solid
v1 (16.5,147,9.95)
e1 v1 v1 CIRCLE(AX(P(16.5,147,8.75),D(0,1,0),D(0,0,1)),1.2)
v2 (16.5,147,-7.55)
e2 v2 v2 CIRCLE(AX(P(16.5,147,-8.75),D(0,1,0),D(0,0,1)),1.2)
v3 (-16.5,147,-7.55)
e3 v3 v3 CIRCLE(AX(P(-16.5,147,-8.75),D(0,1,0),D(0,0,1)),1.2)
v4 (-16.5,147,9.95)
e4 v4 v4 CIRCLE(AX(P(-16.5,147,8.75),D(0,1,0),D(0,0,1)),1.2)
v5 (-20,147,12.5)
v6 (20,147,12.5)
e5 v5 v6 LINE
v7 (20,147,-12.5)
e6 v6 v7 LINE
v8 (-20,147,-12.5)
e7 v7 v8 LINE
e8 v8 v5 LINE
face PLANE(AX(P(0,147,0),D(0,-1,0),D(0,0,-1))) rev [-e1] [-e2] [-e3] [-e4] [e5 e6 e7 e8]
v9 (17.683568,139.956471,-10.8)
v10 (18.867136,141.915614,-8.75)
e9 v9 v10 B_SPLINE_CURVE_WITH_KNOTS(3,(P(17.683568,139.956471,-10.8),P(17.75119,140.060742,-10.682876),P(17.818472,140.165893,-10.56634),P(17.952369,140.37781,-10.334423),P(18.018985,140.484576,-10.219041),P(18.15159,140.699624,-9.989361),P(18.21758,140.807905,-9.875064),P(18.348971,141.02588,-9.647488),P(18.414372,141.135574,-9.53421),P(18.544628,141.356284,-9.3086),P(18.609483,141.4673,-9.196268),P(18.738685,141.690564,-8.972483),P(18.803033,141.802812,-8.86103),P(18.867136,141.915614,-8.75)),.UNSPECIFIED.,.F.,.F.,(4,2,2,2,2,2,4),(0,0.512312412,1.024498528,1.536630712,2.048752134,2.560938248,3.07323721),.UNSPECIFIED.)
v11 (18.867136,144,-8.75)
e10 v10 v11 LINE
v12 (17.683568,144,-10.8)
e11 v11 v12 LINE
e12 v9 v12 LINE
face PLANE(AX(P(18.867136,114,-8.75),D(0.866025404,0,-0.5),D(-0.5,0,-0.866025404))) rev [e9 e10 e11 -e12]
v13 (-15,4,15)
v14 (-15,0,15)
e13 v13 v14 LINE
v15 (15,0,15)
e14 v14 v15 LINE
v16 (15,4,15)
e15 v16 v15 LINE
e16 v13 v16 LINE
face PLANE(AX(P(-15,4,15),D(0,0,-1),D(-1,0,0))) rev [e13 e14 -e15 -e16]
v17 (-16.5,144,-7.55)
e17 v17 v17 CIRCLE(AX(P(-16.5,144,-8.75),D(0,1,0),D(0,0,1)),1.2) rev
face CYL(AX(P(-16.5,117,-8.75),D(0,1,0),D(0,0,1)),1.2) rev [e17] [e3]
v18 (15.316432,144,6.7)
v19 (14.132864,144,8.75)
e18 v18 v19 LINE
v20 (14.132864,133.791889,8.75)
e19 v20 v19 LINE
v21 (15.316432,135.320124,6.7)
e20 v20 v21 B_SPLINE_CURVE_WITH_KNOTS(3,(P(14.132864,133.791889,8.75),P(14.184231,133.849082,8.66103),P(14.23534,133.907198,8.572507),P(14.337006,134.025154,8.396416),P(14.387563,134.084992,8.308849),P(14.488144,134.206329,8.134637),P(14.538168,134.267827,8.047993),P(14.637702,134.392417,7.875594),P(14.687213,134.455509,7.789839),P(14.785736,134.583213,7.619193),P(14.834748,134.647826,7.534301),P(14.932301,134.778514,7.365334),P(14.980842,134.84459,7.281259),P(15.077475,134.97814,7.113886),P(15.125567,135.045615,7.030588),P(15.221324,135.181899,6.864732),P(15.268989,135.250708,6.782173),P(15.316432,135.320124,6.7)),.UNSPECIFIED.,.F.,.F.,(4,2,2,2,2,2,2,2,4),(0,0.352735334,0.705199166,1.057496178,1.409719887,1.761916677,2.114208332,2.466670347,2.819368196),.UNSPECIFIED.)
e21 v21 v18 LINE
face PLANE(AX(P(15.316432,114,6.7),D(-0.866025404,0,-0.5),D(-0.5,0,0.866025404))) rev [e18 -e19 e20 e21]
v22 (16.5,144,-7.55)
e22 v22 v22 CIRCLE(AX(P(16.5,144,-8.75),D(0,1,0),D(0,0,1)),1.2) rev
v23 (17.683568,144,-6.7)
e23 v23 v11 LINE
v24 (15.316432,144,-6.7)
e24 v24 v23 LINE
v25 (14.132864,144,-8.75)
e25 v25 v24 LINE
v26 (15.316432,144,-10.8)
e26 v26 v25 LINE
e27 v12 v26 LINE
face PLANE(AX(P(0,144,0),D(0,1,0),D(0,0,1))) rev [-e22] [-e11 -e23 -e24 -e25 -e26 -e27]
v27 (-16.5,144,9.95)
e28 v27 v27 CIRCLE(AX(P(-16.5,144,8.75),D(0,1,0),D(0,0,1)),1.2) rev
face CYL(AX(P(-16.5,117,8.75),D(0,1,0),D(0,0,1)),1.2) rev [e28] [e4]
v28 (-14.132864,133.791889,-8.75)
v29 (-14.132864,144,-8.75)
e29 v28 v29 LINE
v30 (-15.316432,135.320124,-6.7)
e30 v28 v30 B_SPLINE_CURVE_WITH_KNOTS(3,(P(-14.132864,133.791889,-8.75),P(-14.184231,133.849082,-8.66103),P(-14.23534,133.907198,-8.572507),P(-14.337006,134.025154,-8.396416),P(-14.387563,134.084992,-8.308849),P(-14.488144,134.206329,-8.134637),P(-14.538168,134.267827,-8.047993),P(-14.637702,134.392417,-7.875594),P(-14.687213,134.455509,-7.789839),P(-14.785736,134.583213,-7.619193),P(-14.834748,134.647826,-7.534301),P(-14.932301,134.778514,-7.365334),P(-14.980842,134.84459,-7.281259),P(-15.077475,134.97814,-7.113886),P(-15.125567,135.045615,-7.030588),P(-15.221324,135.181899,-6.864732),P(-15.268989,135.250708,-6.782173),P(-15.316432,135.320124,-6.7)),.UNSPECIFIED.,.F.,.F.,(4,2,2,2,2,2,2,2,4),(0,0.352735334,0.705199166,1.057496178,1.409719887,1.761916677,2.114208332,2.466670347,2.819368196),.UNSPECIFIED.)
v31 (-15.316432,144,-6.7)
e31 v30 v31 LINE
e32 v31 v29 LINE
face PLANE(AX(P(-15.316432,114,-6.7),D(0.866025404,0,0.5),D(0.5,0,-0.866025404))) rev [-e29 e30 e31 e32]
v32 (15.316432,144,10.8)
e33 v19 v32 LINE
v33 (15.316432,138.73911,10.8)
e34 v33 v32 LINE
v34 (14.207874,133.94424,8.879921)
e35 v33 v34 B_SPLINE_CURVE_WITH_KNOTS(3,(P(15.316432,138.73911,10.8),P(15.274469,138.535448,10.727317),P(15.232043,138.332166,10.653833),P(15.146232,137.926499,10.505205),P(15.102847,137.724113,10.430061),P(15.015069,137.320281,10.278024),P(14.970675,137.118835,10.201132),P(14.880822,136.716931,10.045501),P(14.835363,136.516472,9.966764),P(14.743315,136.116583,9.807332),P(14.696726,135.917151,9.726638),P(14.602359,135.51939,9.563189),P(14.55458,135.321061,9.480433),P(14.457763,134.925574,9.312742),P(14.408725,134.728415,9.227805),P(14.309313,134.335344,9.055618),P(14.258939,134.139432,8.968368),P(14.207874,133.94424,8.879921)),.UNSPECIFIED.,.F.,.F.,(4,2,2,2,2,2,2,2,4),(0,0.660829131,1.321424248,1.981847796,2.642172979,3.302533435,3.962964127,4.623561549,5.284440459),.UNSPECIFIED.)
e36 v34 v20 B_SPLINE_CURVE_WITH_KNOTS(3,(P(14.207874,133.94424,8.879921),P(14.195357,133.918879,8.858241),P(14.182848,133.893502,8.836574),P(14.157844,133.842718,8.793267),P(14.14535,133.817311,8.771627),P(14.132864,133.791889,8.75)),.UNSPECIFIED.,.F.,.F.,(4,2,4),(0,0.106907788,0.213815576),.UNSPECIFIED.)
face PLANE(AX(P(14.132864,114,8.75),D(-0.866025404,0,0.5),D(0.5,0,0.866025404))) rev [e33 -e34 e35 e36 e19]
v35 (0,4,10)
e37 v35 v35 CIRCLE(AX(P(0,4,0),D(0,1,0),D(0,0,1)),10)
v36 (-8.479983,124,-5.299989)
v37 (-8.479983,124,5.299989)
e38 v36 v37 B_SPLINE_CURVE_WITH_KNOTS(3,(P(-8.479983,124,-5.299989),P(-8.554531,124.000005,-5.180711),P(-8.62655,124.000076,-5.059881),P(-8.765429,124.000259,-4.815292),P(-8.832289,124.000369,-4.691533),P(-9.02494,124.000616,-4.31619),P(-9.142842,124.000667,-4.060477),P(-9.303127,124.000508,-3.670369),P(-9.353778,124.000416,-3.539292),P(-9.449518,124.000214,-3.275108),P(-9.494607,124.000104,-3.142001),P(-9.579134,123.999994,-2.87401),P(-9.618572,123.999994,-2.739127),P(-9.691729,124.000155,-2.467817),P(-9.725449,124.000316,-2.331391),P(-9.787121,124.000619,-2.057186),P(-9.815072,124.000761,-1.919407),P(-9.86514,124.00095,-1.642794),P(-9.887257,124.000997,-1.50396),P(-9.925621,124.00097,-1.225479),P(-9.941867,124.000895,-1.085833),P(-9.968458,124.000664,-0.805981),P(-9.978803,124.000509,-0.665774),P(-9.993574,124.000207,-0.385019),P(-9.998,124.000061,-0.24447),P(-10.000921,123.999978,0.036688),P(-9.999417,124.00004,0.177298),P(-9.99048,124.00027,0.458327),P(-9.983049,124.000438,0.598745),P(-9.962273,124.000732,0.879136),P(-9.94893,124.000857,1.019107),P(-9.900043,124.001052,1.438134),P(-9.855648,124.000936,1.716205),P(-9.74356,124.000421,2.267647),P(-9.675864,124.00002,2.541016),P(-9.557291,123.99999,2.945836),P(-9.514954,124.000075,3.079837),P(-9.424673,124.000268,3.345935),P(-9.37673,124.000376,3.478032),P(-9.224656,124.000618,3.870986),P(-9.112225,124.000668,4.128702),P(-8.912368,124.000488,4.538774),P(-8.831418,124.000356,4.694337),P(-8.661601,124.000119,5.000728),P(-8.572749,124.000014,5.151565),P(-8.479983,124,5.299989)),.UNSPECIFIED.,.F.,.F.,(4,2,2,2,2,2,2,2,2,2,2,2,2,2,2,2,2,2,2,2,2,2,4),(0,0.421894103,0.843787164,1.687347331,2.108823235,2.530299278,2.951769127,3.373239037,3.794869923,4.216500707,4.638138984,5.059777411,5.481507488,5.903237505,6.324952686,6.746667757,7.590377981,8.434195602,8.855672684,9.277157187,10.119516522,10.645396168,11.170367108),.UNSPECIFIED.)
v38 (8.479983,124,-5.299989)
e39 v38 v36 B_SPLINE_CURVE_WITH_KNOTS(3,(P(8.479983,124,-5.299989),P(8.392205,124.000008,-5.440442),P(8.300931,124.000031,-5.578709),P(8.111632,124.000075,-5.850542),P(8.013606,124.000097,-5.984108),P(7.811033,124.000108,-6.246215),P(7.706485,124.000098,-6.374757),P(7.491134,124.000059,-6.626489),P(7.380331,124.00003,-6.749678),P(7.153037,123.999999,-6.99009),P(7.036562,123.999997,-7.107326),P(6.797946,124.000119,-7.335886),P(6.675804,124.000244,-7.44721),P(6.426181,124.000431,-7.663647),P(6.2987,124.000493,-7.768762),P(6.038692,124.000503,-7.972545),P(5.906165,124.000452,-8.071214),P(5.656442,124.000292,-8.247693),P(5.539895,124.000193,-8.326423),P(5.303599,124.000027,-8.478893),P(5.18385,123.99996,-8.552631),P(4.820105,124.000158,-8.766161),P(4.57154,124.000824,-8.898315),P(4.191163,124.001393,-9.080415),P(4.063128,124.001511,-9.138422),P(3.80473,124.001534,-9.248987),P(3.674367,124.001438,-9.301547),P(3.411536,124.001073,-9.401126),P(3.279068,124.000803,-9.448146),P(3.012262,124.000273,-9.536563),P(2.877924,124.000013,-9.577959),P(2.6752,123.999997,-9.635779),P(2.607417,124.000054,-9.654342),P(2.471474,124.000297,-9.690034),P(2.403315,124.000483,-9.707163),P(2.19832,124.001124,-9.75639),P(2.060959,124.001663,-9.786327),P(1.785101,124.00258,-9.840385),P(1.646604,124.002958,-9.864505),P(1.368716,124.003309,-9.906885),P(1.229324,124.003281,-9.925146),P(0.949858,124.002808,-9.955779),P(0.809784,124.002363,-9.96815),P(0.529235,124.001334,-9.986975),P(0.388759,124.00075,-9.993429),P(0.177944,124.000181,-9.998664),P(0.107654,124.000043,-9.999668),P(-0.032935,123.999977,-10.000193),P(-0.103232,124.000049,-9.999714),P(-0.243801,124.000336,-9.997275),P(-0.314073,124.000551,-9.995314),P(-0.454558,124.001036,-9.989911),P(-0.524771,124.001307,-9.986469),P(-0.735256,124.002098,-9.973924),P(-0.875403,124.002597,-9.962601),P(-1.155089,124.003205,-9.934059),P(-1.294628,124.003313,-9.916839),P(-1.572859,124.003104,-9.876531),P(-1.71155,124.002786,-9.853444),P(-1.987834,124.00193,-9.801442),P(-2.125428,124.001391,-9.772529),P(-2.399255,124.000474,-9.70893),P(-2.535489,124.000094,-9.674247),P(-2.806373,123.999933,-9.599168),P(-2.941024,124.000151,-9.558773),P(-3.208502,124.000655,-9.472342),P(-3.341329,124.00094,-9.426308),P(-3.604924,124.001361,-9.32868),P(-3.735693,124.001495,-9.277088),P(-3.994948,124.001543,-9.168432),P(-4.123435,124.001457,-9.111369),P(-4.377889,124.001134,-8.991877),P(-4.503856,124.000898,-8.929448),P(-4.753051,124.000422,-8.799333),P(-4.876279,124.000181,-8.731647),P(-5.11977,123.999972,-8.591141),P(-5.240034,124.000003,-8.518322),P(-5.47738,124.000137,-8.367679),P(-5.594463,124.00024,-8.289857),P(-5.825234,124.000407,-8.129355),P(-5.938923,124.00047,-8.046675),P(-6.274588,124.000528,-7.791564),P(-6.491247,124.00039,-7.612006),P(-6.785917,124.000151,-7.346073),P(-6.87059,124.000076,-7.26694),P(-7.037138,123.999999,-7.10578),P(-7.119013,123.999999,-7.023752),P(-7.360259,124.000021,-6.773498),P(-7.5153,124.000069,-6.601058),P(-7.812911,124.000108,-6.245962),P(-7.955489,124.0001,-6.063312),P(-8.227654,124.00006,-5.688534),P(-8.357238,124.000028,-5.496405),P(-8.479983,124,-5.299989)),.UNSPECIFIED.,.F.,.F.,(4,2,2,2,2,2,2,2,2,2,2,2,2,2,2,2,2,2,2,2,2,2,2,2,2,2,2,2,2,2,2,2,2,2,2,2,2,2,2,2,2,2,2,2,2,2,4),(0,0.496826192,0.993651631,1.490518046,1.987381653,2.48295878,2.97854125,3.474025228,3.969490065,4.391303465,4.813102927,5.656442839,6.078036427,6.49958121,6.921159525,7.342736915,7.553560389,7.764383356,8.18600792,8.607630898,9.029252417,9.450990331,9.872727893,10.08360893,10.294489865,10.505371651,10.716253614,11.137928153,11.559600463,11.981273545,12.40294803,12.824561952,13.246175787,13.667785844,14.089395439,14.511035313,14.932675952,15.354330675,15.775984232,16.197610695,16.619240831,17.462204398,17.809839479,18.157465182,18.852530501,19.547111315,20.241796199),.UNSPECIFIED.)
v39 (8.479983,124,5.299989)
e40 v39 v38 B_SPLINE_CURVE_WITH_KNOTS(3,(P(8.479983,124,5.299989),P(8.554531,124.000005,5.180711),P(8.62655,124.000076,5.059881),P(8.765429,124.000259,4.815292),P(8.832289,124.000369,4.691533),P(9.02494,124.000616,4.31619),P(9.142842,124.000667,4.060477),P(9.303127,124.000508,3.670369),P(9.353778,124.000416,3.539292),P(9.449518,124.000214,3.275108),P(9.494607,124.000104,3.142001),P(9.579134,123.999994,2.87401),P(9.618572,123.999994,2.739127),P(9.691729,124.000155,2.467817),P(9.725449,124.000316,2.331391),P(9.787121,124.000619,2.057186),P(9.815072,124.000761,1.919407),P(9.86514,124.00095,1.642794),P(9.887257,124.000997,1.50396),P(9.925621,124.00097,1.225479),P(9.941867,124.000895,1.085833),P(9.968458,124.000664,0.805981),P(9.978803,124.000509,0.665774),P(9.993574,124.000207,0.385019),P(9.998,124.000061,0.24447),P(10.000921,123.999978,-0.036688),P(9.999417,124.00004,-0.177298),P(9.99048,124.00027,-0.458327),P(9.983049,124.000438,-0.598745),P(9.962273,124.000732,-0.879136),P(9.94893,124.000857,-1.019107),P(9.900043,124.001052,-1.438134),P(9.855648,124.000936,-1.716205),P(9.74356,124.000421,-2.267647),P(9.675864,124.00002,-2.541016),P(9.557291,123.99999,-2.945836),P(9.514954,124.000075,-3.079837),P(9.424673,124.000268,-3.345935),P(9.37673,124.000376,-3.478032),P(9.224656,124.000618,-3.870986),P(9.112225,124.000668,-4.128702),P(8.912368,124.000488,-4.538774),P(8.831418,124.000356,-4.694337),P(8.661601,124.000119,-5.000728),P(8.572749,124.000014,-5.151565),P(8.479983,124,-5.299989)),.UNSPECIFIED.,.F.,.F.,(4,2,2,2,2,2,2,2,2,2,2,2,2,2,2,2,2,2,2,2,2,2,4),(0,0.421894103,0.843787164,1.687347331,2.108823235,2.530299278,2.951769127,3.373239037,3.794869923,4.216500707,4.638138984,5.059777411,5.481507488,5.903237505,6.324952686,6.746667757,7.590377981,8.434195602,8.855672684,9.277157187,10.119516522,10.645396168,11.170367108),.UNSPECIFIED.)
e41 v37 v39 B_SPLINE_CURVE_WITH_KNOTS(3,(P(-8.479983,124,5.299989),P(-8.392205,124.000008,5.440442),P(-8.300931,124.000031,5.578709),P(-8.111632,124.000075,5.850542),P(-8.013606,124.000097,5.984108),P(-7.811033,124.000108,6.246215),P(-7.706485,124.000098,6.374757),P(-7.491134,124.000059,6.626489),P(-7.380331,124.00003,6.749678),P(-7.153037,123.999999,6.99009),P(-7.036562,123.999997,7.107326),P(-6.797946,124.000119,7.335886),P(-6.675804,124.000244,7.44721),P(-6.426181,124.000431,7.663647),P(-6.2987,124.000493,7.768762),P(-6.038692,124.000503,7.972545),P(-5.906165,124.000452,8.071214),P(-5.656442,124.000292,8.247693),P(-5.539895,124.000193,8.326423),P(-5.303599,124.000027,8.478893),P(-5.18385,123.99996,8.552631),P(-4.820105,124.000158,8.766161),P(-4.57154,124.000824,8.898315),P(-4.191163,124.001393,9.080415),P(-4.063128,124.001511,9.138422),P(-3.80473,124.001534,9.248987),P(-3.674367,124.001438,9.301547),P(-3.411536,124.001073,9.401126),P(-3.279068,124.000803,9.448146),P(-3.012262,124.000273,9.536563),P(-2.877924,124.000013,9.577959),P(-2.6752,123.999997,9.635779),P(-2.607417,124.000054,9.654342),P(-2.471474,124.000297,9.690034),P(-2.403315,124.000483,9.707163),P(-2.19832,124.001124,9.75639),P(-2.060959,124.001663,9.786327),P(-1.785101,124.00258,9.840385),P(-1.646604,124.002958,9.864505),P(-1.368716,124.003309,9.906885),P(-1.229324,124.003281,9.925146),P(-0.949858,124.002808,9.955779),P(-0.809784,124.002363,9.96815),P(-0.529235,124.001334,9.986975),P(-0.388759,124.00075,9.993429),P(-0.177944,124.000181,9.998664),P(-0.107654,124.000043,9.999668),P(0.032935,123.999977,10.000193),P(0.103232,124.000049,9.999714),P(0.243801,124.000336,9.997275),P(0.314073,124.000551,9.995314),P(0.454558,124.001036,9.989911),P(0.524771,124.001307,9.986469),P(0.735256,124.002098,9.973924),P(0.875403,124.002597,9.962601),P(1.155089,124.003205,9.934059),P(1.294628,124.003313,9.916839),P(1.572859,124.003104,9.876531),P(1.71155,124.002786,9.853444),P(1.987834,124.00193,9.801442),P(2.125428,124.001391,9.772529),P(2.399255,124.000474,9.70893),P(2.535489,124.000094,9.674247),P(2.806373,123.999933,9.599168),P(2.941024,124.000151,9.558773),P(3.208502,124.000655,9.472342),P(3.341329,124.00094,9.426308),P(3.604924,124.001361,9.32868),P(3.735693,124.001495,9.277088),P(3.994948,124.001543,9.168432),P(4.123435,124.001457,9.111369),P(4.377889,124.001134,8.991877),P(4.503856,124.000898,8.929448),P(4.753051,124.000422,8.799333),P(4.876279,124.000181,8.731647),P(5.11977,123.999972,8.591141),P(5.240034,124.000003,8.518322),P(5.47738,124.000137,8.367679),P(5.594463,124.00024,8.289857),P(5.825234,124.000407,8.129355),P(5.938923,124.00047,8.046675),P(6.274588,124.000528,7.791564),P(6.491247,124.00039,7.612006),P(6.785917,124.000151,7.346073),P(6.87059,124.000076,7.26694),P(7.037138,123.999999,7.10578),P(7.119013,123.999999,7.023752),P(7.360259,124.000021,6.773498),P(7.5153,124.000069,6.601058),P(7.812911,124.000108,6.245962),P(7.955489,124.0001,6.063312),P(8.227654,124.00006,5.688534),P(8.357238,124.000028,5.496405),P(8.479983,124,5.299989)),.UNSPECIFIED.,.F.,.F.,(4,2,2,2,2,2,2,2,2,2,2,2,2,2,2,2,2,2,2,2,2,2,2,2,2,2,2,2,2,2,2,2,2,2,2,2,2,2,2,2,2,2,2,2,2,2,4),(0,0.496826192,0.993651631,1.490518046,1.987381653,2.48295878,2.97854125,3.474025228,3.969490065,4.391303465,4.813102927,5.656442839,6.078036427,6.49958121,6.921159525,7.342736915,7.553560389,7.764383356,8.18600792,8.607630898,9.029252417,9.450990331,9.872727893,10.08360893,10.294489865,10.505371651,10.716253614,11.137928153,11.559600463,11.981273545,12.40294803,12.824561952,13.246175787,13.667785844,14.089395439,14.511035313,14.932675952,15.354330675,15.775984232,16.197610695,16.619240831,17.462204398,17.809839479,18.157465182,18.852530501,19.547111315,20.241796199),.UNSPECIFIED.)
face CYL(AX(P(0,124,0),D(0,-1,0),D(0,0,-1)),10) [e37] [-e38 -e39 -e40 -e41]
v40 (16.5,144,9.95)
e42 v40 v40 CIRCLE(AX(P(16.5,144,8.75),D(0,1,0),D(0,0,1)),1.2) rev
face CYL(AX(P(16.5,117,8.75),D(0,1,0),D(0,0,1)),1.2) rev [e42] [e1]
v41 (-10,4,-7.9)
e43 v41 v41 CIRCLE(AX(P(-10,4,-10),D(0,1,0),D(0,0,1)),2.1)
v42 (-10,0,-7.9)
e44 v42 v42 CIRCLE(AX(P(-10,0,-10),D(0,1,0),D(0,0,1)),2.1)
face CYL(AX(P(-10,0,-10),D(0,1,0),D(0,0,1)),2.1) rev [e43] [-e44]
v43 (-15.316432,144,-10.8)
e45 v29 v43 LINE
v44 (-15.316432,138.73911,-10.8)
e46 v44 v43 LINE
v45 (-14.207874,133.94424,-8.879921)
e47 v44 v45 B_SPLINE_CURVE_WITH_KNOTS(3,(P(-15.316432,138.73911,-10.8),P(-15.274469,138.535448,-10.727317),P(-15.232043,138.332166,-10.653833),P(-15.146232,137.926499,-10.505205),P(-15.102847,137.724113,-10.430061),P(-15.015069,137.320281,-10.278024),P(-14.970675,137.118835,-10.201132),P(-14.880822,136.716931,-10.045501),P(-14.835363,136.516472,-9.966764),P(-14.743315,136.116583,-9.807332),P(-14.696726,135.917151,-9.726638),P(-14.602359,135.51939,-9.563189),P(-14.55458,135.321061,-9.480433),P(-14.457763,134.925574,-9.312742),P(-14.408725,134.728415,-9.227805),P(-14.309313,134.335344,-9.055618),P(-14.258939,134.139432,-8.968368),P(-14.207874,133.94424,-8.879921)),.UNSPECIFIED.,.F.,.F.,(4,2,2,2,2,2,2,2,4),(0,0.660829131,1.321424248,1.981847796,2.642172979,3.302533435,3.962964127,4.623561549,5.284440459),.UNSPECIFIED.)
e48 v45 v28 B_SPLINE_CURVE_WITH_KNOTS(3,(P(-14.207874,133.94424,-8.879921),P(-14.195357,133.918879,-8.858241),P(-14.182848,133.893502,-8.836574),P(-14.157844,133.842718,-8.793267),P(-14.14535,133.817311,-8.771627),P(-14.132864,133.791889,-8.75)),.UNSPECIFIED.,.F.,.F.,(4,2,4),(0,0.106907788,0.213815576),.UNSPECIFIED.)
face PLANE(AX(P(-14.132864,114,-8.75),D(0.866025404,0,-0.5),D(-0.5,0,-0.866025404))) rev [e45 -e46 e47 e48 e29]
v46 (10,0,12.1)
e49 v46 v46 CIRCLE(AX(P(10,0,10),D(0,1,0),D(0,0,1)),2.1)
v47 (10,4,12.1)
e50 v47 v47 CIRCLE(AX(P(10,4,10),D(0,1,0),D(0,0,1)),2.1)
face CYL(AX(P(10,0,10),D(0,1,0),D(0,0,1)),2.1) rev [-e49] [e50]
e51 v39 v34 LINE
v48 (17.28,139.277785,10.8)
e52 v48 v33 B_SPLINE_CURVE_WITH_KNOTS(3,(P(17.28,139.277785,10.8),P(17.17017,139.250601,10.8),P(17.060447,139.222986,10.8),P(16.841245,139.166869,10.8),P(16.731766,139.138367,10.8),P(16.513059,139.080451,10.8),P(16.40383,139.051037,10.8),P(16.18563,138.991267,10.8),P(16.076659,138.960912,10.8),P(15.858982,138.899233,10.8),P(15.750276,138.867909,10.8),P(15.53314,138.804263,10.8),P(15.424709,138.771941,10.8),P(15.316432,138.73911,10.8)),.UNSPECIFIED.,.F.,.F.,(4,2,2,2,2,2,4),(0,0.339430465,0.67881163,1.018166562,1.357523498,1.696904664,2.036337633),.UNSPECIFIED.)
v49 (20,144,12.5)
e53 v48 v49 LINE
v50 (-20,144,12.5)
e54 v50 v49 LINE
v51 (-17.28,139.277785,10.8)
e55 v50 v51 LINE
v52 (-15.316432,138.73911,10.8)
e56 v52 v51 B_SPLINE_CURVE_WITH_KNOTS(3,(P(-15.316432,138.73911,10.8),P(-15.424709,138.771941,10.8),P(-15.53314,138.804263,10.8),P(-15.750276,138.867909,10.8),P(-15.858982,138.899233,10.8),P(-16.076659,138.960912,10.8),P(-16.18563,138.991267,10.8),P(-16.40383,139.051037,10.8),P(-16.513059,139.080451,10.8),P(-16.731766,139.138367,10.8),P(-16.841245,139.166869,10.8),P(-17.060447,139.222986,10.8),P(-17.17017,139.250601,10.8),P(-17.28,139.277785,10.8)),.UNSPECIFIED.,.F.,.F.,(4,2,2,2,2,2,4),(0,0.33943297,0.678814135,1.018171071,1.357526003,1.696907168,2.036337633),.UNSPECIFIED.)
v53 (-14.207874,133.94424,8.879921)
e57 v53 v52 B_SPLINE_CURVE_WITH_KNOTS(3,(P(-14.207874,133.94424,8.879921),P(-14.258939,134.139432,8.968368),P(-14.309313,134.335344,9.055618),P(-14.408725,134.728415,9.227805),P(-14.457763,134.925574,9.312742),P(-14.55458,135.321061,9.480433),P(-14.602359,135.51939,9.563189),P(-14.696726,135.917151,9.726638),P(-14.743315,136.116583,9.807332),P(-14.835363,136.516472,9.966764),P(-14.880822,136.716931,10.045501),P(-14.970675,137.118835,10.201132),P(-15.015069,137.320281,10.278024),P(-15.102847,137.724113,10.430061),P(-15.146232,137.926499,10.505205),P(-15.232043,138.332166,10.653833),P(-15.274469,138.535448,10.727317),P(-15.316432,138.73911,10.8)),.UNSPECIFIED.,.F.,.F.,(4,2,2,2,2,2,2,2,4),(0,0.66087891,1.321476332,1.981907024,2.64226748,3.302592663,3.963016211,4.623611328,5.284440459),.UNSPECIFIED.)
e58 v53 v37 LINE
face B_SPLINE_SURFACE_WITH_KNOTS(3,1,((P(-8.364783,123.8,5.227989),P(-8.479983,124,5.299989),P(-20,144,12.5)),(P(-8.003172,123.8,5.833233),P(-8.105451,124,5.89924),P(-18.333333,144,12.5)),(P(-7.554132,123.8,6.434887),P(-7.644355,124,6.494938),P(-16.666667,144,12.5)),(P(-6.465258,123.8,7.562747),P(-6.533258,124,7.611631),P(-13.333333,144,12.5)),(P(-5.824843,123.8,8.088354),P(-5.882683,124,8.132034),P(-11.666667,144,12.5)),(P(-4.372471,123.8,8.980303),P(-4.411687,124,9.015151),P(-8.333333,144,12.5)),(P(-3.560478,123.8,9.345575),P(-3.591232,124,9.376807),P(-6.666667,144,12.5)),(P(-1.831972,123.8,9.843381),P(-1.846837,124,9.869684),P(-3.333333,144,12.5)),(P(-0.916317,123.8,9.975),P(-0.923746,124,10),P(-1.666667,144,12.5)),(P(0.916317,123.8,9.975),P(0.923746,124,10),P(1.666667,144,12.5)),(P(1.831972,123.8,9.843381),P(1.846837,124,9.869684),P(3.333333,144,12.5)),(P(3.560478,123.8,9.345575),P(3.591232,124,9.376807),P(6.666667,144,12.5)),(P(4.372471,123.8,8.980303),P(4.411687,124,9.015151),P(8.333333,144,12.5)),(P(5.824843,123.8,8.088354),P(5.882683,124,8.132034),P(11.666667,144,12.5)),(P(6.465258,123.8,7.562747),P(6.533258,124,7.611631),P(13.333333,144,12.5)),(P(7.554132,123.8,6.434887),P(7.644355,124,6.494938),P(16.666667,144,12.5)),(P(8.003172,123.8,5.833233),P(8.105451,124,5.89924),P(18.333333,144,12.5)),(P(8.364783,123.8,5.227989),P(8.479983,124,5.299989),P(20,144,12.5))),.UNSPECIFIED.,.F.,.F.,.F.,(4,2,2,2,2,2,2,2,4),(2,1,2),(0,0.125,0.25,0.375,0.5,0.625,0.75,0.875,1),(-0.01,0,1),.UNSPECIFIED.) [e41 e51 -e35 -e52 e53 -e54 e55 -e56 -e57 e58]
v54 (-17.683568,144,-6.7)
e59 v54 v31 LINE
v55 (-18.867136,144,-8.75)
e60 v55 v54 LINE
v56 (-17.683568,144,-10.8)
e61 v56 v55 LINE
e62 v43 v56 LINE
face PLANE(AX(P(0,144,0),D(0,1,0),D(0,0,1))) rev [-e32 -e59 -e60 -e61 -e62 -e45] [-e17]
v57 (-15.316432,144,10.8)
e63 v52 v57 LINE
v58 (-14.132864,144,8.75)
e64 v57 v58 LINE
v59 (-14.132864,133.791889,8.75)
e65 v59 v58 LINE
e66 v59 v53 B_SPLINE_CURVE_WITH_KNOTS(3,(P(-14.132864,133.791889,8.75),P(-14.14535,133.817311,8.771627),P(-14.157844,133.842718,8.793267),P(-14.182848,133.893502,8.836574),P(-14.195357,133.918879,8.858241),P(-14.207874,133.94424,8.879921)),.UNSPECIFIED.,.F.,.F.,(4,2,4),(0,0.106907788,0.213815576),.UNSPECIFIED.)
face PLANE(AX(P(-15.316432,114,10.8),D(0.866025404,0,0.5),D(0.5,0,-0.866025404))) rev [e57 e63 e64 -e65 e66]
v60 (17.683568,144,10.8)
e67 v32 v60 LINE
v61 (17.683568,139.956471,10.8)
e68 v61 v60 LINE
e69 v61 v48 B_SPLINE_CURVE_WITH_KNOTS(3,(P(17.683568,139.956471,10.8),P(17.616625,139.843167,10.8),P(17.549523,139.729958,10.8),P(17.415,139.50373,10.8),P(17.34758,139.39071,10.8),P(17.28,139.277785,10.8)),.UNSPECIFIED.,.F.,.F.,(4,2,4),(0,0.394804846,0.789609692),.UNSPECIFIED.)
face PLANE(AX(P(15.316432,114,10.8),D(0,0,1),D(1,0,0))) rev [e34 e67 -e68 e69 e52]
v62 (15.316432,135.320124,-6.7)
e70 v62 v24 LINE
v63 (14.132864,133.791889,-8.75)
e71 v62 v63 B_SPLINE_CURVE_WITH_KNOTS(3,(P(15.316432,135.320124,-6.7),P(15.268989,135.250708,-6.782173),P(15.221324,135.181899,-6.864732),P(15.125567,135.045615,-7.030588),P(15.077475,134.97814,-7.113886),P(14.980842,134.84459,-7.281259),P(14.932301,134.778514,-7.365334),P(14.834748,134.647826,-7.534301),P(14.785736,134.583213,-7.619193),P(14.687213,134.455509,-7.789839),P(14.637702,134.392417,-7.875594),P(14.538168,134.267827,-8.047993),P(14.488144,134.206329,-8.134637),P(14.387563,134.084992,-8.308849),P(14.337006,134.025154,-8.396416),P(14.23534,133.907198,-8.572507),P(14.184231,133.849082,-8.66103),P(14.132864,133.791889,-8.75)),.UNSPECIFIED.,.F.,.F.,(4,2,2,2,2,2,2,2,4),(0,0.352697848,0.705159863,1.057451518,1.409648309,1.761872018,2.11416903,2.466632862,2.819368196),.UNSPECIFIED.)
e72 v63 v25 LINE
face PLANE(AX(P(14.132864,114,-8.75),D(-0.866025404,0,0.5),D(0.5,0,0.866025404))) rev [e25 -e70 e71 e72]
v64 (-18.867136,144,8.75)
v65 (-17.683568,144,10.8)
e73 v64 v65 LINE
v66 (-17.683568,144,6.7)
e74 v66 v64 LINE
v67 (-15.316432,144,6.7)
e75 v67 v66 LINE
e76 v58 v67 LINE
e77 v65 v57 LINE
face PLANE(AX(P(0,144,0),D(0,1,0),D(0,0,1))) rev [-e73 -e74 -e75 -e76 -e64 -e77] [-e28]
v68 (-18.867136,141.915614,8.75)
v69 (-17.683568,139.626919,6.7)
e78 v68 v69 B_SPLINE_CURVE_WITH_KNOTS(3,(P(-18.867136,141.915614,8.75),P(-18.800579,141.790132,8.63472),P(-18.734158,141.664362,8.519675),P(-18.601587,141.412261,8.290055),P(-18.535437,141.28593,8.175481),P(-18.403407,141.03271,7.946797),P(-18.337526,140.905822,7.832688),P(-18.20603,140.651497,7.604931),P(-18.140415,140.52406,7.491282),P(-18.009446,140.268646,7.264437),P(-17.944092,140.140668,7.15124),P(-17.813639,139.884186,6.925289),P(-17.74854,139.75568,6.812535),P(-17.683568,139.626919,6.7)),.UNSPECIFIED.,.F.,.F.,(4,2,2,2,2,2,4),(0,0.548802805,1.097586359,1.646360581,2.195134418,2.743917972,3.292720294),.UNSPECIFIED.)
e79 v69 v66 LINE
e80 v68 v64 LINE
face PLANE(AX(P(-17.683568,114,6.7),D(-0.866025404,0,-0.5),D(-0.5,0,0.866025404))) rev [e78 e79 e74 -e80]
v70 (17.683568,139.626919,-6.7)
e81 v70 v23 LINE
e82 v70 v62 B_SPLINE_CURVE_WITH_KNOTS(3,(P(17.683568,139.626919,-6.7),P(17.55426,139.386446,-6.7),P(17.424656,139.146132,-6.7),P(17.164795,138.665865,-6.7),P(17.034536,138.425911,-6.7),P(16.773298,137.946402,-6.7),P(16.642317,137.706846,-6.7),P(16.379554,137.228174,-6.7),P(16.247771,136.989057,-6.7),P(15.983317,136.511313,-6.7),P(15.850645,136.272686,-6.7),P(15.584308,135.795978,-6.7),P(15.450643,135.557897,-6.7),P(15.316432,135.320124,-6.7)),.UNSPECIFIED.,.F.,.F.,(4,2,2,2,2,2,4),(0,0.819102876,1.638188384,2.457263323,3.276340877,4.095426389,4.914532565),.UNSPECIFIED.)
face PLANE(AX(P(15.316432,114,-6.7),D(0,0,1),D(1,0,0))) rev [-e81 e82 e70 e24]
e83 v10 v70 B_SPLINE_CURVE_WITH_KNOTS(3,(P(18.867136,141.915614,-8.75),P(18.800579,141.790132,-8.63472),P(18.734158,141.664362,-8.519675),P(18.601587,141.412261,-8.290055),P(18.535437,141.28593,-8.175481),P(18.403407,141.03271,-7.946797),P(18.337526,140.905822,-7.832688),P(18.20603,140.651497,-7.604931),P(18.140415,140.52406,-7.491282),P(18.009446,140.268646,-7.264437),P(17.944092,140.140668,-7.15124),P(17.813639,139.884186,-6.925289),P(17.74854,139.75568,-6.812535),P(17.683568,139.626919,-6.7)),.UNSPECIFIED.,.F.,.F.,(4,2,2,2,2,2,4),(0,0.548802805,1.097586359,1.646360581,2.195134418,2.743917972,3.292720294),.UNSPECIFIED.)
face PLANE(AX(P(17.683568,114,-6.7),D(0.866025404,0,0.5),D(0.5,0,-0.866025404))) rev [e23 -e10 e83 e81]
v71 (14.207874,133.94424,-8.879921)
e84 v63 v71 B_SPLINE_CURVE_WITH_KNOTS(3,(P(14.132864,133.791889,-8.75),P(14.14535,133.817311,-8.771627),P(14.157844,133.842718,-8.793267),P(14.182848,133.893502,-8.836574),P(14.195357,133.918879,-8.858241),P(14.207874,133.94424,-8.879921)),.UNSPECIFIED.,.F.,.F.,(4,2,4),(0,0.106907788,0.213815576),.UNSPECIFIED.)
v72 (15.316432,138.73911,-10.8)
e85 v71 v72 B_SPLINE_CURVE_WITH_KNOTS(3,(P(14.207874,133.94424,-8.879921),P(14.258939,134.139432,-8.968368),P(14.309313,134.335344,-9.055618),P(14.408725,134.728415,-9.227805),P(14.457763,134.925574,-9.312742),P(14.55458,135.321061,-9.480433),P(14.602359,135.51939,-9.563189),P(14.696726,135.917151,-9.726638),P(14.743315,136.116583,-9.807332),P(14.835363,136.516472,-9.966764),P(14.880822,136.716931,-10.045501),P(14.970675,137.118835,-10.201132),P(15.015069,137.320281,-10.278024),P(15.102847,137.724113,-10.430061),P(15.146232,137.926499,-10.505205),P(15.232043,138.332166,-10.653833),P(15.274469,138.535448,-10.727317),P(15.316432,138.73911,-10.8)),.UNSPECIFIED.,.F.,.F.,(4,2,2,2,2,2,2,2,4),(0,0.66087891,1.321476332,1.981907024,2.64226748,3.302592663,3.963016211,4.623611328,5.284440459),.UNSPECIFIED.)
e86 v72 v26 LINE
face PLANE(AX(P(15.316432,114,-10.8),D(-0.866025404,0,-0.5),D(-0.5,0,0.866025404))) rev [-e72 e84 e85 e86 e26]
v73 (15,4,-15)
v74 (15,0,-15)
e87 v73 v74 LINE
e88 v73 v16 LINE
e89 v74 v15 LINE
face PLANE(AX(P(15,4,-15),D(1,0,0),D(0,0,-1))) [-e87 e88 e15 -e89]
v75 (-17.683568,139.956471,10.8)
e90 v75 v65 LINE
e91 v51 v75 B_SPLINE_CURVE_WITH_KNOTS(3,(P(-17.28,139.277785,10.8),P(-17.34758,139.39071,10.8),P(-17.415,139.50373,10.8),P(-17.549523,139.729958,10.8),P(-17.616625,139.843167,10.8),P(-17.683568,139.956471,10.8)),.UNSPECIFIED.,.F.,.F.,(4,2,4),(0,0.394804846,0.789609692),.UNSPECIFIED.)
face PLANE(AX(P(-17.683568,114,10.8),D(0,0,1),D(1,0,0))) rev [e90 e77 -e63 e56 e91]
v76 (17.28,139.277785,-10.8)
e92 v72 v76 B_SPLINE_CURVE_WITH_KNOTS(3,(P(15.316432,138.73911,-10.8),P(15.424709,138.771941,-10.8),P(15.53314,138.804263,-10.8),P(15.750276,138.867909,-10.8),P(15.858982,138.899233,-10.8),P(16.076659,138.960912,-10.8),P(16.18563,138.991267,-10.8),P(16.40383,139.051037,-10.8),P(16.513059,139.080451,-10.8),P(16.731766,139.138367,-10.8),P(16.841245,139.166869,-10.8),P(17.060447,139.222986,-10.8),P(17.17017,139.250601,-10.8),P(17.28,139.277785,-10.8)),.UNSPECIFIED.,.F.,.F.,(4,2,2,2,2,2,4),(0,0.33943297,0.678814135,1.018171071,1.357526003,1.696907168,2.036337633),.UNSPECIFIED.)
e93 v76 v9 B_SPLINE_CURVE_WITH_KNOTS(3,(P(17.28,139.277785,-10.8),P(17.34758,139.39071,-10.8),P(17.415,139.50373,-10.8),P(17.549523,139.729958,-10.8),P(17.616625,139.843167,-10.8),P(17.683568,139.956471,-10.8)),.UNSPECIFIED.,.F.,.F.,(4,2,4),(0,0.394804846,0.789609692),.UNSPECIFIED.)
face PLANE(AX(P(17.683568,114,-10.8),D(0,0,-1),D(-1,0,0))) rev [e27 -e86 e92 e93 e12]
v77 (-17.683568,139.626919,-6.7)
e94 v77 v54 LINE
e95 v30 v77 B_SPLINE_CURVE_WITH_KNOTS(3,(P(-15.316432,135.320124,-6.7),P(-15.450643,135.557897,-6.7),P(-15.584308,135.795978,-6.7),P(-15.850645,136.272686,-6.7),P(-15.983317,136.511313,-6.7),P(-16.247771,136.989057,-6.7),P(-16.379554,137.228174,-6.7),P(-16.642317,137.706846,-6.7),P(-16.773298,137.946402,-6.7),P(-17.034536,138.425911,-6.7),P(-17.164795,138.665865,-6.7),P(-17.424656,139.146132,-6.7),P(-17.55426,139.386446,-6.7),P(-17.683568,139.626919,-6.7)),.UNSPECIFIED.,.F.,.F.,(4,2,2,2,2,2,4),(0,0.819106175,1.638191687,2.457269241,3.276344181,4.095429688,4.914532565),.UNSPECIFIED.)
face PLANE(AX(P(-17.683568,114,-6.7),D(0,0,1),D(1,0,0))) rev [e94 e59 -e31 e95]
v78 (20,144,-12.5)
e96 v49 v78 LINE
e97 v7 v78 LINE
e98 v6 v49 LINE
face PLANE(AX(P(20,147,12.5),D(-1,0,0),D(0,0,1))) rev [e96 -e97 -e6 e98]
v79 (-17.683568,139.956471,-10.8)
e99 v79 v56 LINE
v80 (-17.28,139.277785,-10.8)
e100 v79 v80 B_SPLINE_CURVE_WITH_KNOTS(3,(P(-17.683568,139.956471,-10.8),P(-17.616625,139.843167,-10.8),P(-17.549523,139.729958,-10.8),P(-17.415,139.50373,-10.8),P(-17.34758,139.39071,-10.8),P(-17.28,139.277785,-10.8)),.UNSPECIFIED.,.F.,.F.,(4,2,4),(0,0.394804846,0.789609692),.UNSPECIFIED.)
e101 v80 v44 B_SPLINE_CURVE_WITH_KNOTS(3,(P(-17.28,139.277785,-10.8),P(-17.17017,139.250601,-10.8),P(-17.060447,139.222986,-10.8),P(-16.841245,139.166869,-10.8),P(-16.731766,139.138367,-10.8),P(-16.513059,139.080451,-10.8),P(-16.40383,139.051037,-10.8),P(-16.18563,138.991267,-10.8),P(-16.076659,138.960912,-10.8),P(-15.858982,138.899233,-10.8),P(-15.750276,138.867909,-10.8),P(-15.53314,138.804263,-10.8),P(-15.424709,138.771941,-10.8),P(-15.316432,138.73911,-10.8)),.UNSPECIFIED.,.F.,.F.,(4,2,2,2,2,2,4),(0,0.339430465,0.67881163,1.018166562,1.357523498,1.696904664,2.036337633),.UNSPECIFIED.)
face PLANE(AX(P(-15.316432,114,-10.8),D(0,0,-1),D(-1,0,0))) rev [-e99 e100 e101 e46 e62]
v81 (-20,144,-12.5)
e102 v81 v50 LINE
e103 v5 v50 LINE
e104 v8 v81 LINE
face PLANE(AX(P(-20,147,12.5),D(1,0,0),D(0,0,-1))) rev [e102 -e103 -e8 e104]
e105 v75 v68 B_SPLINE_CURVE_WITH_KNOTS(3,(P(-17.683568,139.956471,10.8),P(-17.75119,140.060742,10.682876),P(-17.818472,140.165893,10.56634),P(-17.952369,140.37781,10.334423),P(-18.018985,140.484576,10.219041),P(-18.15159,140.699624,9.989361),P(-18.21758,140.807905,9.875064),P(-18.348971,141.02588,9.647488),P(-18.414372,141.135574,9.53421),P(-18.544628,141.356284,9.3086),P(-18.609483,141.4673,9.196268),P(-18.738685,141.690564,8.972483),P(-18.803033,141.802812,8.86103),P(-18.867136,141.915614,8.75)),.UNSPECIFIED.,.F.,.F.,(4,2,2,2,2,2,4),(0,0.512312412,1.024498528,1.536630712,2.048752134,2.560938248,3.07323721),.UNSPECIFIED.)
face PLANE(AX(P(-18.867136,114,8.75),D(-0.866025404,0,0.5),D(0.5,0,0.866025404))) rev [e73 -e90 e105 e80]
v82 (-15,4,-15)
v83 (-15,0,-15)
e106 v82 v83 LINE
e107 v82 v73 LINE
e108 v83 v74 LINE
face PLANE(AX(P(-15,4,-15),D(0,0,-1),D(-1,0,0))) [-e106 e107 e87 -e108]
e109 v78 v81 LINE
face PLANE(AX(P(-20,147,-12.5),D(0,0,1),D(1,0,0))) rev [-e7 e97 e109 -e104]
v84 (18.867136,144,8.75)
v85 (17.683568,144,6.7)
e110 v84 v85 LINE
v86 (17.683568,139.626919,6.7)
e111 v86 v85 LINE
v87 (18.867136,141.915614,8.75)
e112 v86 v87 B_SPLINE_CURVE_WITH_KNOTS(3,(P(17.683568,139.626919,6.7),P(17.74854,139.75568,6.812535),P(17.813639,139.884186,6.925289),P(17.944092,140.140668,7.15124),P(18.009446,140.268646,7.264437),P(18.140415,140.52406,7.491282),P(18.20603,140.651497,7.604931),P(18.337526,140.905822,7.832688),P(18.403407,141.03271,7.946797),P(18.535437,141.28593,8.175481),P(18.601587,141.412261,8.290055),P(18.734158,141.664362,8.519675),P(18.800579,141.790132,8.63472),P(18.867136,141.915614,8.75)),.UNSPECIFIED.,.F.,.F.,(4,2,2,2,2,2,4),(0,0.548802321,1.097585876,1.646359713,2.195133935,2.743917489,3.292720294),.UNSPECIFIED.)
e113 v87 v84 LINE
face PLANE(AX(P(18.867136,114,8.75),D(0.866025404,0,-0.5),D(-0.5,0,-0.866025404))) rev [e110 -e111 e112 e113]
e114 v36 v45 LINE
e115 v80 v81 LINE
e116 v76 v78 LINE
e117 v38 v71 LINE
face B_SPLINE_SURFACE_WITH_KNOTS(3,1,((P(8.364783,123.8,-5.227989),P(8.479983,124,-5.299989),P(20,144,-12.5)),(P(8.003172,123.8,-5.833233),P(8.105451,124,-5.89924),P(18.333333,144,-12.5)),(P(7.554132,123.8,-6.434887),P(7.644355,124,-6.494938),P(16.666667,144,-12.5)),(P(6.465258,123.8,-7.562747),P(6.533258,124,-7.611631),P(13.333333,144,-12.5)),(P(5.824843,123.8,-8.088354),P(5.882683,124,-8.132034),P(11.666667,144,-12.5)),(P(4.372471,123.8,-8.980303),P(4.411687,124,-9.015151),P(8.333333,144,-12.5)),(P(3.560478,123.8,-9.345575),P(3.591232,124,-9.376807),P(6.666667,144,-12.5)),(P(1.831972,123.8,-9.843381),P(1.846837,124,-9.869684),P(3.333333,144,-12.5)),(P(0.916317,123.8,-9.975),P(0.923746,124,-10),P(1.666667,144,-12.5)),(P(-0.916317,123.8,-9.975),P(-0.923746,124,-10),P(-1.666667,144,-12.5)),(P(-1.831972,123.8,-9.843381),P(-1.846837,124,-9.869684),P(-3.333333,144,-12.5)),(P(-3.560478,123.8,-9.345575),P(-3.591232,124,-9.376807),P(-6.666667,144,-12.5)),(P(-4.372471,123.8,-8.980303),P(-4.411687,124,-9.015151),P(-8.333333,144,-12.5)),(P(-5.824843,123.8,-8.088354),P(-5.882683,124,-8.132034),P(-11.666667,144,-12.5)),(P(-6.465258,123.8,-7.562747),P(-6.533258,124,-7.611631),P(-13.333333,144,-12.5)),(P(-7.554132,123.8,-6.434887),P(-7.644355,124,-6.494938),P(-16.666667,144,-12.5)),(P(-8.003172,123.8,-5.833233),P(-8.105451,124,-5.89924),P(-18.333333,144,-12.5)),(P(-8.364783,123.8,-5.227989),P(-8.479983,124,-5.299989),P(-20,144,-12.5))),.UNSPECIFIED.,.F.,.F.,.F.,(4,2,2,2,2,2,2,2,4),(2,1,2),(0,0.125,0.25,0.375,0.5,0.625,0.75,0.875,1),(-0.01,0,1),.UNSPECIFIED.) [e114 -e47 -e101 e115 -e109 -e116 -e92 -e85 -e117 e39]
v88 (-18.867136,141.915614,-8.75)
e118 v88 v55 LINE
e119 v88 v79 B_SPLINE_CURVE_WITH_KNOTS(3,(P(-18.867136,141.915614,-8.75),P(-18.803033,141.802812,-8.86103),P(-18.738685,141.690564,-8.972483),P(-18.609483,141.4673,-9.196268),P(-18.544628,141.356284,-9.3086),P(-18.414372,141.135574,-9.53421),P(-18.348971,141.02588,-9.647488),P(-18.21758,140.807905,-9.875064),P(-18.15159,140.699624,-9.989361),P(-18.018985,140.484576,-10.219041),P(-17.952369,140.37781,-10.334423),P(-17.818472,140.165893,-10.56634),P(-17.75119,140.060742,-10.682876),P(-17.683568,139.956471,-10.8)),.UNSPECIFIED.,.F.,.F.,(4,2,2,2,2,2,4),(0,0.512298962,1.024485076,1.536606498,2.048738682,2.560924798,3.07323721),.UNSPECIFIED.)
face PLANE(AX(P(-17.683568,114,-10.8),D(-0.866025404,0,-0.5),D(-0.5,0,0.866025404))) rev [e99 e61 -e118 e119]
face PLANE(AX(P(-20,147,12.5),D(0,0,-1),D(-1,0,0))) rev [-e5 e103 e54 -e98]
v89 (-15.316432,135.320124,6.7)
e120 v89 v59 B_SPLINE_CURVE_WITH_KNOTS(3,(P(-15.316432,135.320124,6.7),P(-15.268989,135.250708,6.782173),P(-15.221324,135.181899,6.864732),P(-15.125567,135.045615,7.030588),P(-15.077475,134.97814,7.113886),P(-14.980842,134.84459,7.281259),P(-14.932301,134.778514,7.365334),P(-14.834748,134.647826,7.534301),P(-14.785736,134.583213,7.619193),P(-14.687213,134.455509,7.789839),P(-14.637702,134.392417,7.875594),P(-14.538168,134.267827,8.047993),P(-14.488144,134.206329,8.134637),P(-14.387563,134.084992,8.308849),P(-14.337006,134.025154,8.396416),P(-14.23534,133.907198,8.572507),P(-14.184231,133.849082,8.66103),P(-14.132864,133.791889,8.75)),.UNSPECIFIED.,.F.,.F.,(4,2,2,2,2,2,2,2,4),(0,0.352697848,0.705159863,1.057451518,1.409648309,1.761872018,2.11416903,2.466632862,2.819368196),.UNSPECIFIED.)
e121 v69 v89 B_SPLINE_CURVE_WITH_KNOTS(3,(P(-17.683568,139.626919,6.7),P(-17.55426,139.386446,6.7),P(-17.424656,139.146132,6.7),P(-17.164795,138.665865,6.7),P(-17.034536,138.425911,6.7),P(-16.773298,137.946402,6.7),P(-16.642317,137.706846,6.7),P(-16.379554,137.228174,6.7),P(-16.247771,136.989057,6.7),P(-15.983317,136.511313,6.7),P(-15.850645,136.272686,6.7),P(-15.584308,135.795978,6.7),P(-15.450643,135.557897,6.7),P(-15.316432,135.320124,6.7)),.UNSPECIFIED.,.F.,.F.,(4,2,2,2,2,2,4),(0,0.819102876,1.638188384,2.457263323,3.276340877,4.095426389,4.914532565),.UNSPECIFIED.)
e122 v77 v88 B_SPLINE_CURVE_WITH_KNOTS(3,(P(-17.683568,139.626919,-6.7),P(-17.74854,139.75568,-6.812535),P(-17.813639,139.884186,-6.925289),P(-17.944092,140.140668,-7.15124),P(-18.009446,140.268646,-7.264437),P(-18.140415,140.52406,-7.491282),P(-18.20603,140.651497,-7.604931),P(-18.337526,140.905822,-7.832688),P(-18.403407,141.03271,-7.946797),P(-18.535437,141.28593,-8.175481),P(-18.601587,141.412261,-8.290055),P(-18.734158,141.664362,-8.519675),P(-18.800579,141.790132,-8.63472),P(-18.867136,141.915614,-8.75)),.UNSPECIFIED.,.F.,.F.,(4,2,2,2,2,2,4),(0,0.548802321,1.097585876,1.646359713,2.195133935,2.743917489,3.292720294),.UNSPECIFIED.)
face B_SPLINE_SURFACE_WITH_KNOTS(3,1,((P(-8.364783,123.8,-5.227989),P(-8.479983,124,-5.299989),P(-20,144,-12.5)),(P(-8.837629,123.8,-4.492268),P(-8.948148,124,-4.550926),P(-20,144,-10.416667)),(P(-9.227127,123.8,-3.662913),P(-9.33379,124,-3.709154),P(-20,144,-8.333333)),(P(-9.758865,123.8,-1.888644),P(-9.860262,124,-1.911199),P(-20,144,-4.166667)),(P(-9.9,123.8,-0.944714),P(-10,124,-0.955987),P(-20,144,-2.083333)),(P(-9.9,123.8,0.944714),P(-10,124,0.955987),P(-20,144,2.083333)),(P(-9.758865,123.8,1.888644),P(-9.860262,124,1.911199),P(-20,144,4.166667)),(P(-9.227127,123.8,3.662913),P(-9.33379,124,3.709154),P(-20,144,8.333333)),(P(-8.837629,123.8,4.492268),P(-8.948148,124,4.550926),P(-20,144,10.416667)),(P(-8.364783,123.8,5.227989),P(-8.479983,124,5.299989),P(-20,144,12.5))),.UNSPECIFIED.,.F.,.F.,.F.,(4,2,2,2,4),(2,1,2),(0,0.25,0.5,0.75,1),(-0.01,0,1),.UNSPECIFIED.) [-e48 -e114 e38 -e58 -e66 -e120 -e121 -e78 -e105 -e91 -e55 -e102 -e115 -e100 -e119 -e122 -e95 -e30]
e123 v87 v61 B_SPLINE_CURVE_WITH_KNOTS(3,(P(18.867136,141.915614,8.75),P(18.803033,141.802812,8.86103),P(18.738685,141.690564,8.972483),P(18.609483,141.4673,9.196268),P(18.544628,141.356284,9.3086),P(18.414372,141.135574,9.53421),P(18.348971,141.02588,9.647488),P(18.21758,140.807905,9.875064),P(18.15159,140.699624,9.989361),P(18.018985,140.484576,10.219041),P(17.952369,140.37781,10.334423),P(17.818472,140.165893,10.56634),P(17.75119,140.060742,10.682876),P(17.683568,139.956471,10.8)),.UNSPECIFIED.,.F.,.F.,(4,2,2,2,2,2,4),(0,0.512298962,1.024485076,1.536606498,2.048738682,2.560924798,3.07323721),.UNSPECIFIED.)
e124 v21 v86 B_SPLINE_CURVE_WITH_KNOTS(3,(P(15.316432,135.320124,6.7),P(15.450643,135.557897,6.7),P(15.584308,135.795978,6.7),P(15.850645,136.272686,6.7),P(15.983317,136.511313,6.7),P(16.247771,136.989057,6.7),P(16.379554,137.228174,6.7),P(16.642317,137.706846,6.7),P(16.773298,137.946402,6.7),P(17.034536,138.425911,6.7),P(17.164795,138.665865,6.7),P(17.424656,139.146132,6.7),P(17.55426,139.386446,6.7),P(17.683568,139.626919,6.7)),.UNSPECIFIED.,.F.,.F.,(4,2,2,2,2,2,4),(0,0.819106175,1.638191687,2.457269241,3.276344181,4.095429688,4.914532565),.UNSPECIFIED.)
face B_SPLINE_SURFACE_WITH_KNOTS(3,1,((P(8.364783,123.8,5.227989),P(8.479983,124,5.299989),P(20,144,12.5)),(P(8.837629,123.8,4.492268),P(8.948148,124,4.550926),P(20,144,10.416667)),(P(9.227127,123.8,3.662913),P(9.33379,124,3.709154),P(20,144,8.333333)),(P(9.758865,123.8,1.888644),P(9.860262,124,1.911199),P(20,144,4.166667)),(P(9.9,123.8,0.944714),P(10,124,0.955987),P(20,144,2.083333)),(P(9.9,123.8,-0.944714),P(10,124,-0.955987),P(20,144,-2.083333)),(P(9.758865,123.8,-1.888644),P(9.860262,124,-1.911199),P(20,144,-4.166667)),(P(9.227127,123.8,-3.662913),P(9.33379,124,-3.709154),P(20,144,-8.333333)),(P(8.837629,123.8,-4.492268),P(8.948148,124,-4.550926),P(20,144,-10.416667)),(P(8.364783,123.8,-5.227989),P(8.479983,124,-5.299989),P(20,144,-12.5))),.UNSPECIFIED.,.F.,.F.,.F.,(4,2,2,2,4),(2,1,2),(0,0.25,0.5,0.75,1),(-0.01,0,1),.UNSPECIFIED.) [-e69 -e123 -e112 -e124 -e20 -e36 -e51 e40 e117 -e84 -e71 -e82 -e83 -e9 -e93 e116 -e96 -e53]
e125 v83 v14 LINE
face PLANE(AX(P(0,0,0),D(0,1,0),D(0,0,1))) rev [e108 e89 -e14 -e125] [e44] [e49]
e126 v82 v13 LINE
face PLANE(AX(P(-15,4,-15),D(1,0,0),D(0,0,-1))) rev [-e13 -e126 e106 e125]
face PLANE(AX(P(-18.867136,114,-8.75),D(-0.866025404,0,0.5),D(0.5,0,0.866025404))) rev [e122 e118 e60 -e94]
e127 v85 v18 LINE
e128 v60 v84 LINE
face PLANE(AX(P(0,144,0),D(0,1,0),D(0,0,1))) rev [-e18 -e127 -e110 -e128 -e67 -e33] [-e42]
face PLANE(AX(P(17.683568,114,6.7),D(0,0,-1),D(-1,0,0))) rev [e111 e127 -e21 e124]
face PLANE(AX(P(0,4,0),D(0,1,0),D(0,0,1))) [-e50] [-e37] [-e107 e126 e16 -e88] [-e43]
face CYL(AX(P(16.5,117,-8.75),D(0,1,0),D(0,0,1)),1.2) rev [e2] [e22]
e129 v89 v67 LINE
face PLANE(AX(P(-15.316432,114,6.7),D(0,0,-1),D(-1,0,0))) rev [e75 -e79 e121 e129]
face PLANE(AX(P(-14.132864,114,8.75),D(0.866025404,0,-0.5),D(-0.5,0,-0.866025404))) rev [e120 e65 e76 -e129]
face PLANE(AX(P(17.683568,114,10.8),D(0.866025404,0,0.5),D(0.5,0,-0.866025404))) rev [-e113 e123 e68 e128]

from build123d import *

# Parameters (mm, degrees)
SKETCH1_W           = 30
SKETCH1_H           = 30
BOSS_EXTRUDE1_DEPTH = 4
SKETCH2_R           = 2.1
CUT_EXTRUDE1_DEPTH  = 22.587033145
SKETCH3_R           = 10
BOSS_EXTRUDE2_DEPTH = 120
SKETCH4_2_W         = 40
SKETCH4_2_H         = 25
BOSS_EXTRUDE3_DEPTH = 3
SKETCH7_R           = 1.2
CUT_EXTRUDE2_DEPTH  = 30
CUT_EXTRUDE3_DEPTH  = 30


with BuildPart() as part:
    # Sketch1 → Boss-Extrude1 (new body)
    with BuildSketch(Plane(origin=(0, 0, 0), x_dir=(1, 0, 0), z_dir=(0, 1, 0))):
        Rectangle(SKETCH1_W, SKETCH1_H)
    extrude(amount=BOSS_EXTRUDE1_DEPTH)

    # Sketch2 → Cut-Extrude1 (cut, through all)
    with BuildSketch(Plane(origin=(0, 4, 0), x_dir=(1, 0, 0), z_dir=(0, 1, 0))):
        with Locations((-10, 10)):
            Circle(SKETCH2_R)
        with Locations((10, -10)):
            Circle(SKETCH2_R)
    extrude(amount=-CUT_EXTRUDE1_DEPTH, mode=Mode.SUBTRACT)

    # Sketch3 → Boss-Extrude2 (add)
    with BuildSketch(Plane(origin=(0, 4, 0), x_dir=(1, 0, 0), z_dir=(0, 1, 0))):
        Circle(SKETCH3_R)
    extrude(amount=BOSS_EXTRUDE2_DEPTH)

    # Sketch5 for Loft1 → Loft1 section 0
    with BuildSketch(Plane(origin=(0, 124, 0), x_dir=(1, 0, 0), z_dir=(0, 1, 0))):
        with BuildLine():
            # circular arc as an exact rational Bezier (weights 1, cos(half-angle), 1)
            Bezier((-8.47998304, -5.2999894), (0, -18.867962264), (8.47998304, -5.2999894), weights=[1, 0.52999894, 1])
            Bezier((8.47998304, -5.2999894), (11.792476415, 0), (8.47998304, 5.2999894), weights=[1, 0.847998304, 1])
            Bezier((8.47998304, 5.2999894), (0, 18.867962264), (-8.47998304, 5.2999894), weights=[1, 0.52999894, 1])
            Bezier((-8.47998304, 5.2999894), (-11.792476415, 0), (-8.47998304, -5.2999894), weights=[1, 0.847998304, 1])
        make_face()
    # Sketch4 → Loft1 section 1
    with BuildSketch(Plane(origin=(0, 144, 0), x_dir=(1, 0, 0), z_dir=(0, 1, 0))):
        with BuildLine():
            Line((-20, -12.5), (20, -12.5))
            Line((20, -12.5), (20, 12.5))
            Line((20, 12.5), (-20, 12.5))
            Line((-20, 12.5), (-20, -12.5))
        make_face()
    loft()

    # Sketch4<2> → Boss-Extrude3 (add)
    with BuildSketch(Plane(origin=(0, 144, 0), x_dir=(1, 0, 0), z_dir=(0, 1, 0))):
        Rectangle(SKETCH4_2_W, SKETCH4_2_H)
    extrude(amount=BOSS_EXTRUDE3_DEPTH)

    # Sketch7 → Cut-Extrude2 (cut)
    with BuildSketch(Plane(origin=(0, 147, 0), x_dir=(1, 0, 0), z_dir=(0, 1, 0))):
        with Locations((-16.5, 8.75)):
            Circle(SKETCH7_R)
        with Locations((-16.5, -8.75)):
            Circle(SKETCH7_R)
        with Locations((16.5, 8.75)):
            Circle(SKETCH7_R)
        with Locations((16.5, -8.75)):
            Circle(SKETCH7_R)
    extrude(amount=-CUT_EXTRUDE2_DEPTH, mode=Mode.SUBTRACT)

    # Sketch8 → Cut-Extrude3 (cut)
    with BuildSketch(Plane(origin=(0, 144, 0), x_dir=(1, 0, 0), z_dir=(0, 1, 0))):
        Polygon((-17.683568052, 6.7), (-15.316431948, 6.7), (-14.132863896, 8.75), (-15.316431948, 10.8), (-17.683568052, 10.8), (-18.867136104, 8.75), align=None)
        Polygon((-15.316431948, -6.7), (-17.683568052, -6.7), (-18.867136104, -8.75), (-17.683568052, -10.8), (-15.316431948, -10.8), (-14.132863896, -8.75), align=None)
        Polygon((15.316431948, 6.7), (17.683568052, 6.7), (18.867136104, 8.75), (17.683568052, 10.8), (15.316431948, 10.8), (14.132863896, 8.75), align=None)
        Polygon((14.132863896, -8.75), (15.316431948, -10.8), (17.683568052, -10.8), (18.867136104, -8.75), (17.683568052, -6.7), (15.316431948, -6.7), align=None)
    extrude(amount=-CUT_EXTRUDE3_DEPTH, mode=Mode.SUBTRACT)


solid = part.part
